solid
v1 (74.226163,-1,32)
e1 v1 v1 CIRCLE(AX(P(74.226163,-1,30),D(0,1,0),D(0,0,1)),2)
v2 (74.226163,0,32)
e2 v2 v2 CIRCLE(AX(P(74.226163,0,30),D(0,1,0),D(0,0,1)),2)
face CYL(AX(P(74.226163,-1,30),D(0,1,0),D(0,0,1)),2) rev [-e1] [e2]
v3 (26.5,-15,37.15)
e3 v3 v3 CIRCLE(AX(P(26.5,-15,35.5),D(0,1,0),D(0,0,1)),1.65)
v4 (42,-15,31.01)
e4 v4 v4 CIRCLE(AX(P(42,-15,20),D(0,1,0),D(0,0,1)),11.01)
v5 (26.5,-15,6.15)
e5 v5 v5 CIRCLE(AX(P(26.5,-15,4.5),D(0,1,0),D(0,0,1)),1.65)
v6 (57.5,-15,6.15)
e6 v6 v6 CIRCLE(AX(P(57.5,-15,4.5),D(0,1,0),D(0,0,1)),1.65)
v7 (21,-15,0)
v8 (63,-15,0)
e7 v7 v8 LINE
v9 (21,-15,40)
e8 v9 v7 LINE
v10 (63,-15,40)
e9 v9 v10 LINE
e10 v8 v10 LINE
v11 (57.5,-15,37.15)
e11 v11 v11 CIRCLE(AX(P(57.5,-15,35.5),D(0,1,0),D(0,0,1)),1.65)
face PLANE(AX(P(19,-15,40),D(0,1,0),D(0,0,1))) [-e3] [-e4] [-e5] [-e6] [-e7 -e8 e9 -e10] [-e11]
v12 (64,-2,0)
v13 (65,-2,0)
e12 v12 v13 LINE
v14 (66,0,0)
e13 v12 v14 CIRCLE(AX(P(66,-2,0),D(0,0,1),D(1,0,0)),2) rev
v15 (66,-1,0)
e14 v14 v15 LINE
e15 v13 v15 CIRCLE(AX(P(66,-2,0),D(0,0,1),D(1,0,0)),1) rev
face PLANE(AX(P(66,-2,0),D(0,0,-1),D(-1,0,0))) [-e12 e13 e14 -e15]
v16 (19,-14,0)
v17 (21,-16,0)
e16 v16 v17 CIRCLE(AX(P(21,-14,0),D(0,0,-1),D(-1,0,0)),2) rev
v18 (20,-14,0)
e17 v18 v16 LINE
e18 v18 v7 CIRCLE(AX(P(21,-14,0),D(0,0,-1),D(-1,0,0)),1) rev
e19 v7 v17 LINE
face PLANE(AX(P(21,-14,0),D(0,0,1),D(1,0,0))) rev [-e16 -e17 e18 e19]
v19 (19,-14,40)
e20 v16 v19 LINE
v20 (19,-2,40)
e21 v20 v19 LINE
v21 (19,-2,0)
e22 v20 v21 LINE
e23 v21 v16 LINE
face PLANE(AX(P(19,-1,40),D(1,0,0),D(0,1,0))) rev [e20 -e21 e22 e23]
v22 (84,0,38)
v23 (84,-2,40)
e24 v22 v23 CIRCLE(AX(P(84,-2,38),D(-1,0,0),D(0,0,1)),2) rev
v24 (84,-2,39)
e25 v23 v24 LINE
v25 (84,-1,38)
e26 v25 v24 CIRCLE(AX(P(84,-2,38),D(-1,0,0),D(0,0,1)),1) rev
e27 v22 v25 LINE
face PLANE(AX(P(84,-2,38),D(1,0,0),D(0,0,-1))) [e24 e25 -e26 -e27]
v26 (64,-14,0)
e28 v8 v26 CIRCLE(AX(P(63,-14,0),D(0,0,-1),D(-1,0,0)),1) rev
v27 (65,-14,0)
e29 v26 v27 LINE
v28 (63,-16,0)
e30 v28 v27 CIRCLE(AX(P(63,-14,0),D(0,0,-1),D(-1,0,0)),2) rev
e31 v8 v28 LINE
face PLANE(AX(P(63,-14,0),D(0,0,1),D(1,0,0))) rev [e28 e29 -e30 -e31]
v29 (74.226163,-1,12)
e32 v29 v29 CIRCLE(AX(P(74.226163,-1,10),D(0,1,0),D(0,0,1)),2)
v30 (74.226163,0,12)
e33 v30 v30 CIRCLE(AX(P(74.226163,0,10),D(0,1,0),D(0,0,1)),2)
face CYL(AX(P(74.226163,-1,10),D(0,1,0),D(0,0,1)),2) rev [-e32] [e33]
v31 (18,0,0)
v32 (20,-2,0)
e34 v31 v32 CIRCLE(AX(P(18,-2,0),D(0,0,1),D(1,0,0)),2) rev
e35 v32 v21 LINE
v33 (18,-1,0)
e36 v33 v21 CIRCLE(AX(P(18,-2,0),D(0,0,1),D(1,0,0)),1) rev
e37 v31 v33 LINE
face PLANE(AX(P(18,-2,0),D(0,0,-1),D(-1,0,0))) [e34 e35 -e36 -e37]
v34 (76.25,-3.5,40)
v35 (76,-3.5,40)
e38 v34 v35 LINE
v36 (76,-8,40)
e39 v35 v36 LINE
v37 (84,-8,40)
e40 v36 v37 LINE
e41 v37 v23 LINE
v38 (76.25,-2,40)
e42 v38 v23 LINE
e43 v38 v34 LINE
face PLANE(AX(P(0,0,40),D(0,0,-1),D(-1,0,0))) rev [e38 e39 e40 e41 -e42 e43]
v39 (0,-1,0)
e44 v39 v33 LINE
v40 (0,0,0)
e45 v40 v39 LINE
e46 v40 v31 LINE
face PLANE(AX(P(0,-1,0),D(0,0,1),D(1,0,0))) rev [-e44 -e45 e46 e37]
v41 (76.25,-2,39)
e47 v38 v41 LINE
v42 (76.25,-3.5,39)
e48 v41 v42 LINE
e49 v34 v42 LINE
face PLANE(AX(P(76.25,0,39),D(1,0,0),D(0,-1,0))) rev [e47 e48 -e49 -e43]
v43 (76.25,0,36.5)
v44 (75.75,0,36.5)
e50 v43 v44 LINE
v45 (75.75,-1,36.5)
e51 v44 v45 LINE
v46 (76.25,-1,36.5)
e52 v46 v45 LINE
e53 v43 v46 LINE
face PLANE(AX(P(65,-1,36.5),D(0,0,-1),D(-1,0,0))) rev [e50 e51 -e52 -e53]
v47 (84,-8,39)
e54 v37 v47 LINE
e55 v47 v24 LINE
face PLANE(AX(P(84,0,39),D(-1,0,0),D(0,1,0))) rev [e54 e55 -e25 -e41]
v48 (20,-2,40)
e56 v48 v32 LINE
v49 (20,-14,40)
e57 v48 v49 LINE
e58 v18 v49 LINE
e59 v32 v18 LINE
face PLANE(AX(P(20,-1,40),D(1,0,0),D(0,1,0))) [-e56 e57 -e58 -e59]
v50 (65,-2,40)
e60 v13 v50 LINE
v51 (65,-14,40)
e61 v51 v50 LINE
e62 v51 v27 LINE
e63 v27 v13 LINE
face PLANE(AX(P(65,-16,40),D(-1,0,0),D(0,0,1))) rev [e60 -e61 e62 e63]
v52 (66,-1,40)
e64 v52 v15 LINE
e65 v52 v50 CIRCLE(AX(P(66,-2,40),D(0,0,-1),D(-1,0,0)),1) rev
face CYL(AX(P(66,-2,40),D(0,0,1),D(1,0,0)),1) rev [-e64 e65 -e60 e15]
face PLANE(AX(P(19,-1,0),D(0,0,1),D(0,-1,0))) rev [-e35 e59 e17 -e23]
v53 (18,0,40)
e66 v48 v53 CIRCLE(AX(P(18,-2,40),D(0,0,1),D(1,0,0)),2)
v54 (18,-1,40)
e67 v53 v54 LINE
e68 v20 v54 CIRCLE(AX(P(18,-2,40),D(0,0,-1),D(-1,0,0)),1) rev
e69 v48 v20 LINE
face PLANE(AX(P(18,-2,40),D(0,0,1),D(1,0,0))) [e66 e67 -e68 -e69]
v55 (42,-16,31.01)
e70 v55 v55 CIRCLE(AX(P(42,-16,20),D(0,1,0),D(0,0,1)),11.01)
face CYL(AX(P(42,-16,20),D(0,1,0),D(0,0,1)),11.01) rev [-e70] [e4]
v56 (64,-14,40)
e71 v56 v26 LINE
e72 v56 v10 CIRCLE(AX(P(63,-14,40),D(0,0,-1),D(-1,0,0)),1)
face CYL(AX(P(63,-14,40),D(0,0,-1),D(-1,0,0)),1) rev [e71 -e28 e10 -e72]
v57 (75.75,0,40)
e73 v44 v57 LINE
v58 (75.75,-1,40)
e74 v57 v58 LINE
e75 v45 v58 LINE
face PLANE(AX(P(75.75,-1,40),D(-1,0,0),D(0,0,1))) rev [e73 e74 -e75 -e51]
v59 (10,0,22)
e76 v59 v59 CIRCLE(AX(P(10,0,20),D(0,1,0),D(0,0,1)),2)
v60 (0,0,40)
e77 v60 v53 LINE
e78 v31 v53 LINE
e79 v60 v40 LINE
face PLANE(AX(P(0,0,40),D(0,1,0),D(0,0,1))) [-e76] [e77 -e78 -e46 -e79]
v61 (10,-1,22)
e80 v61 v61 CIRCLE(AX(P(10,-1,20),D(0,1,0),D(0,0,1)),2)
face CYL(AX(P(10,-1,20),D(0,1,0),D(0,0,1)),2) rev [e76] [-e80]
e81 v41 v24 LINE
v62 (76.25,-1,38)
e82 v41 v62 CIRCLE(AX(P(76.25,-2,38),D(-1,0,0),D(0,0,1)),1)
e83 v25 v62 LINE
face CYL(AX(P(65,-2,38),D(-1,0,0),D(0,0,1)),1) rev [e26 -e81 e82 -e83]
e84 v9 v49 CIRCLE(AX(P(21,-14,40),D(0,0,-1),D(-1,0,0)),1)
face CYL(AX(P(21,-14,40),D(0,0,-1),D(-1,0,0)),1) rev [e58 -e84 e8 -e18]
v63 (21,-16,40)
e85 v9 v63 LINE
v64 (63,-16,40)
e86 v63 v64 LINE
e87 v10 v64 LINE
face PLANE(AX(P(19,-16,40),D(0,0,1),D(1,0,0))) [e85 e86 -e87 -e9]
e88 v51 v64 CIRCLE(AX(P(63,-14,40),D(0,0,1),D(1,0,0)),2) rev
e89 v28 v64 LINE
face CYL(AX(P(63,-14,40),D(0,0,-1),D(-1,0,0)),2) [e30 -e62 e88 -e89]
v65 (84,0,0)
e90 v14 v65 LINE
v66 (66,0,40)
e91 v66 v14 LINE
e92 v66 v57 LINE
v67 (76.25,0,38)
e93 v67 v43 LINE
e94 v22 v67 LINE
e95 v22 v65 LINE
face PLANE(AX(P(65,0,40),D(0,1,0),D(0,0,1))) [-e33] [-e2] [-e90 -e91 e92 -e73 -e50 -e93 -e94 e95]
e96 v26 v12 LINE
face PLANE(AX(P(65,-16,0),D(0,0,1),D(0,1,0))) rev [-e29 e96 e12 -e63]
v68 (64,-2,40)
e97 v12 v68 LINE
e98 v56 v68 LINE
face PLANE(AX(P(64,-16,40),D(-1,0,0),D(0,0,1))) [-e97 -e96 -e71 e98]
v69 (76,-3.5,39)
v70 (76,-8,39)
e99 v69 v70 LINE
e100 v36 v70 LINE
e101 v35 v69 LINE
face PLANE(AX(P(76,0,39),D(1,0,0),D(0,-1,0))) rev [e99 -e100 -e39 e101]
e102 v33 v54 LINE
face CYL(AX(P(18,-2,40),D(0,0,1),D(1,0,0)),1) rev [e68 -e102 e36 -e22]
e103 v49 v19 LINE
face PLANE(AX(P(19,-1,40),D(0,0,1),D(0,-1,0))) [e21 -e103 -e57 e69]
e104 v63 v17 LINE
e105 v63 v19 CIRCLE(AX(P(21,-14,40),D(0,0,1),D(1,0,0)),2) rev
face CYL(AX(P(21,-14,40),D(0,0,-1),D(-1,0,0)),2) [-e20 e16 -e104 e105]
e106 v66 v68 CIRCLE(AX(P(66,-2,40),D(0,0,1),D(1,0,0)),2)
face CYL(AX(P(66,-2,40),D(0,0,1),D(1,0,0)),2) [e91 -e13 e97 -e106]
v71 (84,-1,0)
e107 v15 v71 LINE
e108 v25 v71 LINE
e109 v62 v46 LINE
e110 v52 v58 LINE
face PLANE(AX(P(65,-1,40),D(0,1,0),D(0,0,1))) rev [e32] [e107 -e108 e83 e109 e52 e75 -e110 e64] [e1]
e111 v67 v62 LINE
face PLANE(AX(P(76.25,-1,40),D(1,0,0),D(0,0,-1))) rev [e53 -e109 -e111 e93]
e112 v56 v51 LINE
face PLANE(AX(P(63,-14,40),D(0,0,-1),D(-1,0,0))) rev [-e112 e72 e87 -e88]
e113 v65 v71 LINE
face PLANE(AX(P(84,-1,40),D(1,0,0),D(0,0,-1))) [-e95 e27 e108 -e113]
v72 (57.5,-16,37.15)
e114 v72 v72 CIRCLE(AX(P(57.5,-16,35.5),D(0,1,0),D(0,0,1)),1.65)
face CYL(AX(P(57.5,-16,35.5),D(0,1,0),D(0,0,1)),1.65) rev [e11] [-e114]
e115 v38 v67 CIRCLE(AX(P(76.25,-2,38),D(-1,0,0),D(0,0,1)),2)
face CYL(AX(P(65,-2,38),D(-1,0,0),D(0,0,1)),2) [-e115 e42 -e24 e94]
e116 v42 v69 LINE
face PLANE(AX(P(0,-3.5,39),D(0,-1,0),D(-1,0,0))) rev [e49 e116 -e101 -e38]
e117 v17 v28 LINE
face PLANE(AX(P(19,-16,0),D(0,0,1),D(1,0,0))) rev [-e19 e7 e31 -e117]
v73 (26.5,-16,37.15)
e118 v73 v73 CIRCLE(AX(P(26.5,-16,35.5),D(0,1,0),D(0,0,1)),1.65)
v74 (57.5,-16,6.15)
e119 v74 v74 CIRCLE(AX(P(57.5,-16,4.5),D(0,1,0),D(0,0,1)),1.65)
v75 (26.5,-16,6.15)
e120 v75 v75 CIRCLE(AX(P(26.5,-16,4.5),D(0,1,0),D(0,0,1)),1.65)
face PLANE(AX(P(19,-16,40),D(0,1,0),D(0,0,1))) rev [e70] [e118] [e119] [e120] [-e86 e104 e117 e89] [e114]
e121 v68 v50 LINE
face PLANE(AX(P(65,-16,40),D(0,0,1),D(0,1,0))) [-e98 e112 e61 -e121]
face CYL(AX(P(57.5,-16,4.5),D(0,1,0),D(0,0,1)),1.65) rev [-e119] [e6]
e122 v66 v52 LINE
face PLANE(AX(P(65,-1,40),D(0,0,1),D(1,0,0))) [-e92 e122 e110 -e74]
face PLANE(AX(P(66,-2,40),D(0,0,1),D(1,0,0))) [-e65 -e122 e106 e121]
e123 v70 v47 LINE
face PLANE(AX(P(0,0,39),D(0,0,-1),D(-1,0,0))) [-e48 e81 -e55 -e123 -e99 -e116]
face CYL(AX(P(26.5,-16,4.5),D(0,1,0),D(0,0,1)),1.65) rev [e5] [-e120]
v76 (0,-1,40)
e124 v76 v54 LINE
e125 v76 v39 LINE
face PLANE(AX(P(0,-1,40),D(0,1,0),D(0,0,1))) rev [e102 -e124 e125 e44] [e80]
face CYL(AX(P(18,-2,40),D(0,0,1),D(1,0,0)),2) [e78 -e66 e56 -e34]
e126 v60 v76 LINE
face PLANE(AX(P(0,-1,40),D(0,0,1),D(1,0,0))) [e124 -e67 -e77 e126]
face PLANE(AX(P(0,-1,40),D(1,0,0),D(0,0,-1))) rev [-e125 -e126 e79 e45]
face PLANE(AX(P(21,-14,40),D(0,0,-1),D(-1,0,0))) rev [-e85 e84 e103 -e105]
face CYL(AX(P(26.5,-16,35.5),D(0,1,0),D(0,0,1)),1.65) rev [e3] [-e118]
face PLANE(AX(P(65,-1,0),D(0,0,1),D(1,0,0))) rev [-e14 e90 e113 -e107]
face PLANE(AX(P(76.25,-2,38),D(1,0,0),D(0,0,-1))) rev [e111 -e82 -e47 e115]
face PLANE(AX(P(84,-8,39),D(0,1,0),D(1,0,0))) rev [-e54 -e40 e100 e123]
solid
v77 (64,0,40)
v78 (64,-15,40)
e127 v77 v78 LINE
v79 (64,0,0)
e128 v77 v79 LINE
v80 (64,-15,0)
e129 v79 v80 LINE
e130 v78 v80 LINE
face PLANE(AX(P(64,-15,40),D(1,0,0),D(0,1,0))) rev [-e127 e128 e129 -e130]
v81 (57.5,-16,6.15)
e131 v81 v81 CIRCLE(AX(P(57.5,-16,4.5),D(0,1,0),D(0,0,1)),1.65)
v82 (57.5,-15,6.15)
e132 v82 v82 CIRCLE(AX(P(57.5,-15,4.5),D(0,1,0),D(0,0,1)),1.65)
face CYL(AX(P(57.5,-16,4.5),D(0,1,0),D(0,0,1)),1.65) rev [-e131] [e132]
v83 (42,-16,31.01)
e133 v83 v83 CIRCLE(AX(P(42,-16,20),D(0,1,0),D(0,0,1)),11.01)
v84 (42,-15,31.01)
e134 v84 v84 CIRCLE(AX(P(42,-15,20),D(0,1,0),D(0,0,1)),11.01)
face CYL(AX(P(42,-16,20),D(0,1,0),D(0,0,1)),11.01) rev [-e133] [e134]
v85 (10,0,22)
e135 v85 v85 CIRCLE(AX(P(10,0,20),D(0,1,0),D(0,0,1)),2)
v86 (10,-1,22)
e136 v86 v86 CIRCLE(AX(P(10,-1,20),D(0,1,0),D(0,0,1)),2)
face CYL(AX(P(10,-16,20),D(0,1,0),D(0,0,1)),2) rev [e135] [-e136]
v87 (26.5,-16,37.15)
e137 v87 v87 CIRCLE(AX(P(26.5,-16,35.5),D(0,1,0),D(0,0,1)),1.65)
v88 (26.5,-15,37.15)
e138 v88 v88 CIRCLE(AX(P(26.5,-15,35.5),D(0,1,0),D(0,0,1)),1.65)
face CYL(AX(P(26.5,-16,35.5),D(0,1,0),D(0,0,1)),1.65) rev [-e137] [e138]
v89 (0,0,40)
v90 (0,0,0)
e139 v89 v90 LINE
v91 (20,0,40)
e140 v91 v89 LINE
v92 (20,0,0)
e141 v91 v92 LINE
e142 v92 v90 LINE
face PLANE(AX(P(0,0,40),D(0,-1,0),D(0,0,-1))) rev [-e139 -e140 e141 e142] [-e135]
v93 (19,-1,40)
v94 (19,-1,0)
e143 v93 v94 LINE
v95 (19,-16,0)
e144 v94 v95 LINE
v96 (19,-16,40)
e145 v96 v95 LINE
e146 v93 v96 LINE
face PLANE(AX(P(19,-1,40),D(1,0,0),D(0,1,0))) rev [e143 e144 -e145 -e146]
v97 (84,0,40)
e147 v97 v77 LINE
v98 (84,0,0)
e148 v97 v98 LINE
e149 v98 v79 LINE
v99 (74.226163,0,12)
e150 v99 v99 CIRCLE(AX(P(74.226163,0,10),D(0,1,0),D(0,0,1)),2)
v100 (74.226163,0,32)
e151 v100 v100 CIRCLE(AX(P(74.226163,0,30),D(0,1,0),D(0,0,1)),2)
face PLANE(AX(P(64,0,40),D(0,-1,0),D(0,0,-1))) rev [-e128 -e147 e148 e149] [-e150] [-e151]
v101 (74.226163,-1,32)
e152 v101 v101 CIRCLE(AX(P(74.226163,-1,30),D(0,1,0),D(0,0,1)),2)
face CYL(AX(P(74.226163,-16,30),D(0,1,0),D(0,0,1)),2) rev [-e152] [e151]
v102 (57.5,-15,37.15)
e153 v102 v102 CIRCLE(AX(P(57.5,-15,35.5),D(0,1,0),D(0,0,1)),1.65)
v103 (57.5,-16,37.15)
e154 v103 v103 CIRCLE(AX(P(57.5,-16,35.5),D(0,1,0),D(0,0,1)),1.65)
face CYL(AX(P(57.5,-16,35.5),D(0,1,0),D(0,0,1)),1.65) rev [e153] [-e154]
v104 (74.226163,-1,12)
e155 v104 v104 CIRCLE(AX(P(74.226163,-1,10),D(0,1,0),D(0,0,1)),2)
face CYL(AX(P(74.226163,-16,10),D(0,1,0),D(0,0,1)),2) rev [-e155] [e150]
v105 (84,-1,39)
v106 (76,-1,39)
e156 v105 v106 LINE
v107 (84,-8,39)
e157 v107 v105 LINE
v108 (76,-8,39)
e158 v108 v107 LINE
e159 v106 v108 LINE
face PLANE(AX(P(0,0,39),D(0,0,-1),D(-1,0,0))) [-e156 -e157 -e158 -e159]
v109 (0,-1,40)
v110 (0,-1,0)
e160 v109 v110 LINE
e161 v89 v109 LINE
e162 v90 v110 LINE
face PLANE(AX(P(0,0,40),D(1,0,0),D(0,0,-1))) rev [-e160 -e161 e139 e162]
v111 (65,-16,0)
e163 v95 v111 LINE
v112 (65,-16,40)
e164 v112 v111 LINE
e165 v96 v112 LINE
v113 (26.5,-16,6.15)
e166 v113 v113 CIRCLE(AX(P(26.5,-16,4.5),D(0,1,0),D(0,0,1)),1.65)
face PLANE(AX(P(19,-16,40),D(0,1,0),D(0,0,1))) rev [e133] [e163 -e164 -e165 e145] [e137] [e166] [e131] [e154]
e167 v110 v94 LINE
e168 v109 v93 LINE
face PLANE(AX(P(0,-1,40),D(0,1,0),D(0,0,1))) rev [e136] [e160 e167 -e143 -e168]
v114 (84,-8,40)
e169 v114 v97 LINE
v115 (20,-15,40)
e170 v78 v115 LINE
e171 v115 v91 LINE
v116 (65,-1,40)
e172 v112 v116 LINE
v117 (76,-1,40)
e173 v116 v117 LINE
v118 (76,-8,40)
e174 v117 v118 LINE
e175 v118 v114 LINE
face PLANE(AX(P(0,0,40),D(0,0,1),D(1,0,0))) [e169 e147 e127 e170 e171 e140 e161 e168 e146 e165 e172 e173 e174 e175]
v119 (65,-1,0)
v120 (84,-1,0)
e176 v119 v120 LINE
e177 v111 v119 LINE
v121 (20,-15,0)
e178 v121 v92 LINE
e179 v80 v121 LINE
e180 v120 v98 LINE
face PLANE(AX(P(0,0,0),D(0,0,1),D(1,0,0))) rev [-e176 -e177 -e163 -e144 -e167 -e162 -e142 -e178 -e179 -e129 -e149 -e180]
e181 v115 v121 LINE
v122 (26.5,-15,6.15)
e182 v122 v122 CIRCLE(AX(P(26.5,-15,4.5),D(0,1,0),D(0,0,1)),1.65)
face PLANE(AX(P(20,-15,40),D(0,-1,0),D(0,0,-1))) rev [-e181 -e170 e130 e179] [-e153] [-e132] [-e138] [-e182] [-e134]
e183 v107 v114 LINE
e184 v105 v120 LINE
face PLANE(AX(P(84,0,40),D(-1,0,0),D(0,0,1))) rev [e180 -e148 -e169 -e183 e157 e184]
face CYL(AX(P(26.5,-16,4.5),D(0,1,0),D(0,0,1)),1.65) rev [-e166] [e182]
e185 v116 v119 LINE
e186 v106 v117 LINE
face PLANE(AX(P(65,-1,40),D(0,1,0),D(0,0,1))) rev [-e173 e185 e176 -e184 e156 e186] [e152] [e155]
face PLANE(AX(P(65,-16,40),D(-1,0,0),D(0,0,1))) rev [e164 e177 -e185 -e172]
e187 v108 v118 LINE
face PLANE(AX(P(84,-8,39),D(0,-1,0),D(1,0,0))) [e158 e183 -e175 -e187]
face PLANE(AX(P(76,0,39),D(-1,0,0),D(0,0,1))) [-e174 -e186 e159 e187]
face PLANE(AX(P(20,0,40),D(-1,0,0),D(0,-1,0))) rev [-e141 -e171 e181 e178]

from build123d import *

# Parameters (mm, degrees)
BOSS_EXTRUDE1_DEPTH          = 40
SKETCH2_R                    = 2
CUT_EXTRUDE1_DEPTH           = 95.40338977
SKETCH4_W                    = 8
SKETCH4_H                    = 8
BOSS_EXTRUDE2_DEPTH          = 1
SKETCH5_R                    = 1.65
SKETCH5_R_2                  = 11.01
CUT_EXTRUDE2_DEPTH           = 95.23905772
CONVERT_SOLID1_START         = -14
CONVERT_SOLID1_OUTLINE_W     = 1
CONVERT_SOLID1_OUTLINE_H     = 40
CONVERT_SOLID1_DEPTH         = 12
CONVERT_SOLID1_START_2       = -8
CONVERT_SOLID1_2_OUTLINE_W   = 7.75
CONVERT_SOLID1_2_OUTLINE_H   = 1
CONVERT_SOLID1_2_DEPTH       = 6
CONVERT_SOLID1_3_OUTLINE_W   = 0.25
CONVERT_SOLID1_3_OUTLINE_H   = 1
CONVERT_SOLID1_3_DEPTH       = 4.5
CONVERT_SOLID1_4_OUTLINE_W   = 7.75
CONVERT_SOLID1_4_OUTLINE_H   = 1
CONVERT_SOLID1_4_DEPTH       = 40
CONVERT_SOLID1_5_OUTLINE_W   = 0.5
CONVERT_SOLID1_5_OUTLINE_H   = 1
CONVERT_SOLID1_5_DEPTH       = 36.5
CONVERT_SOLID1_START_3       = 38
CONVERT_SOLID1_6_OUTLINE_W   = 7.75
CONVERT_SOLID1_6_OUTLINE_H   = 1
CONVERT_SOLID1_6_DEPTH       = 2
CONVERT_SOLID1_START_4       = -16
CONVERT_SOLID1_7_OUTLINE_R   = 1.65
CONVERT_SOLID1_7_OUTLINE_R_2 = 11.01
CONVERT_SOLID1_7_OUTLINE_R_3 = 2
CONVERT_SOLID1_7_DEPTH       = 16
CONVERT_SOLID1_START_5       = 76.25
CONVERT_SOLID1_8_DEPTH       = 7.75


with BuildPart() as part:
    # Sketch1 → Boss-Extrude1 (new body)
    with BuildSketch(Plane.XY):
        Polygon((64, 0), (84, 0), (84, -1), (65, -1), (65, -16), (19, -16), (19, -1), (0, -1), (0, 0), (20, 0), (20, -15), (64, -15), align=None)
    extrude(amount=BOSS_EXTRUDE1_DEPTH)

    # Sketch2 → Cut-Extrude1 (cut, through all)
    with BuildSketch(Plane(origin=(0, 0, 0), x_dir=(1, 0, 0), z_dir=(0, 1, 0))):
        with Locations(Location((10, -20, 0), (0, 0, 270))):
            Circle(SKETCH2_R)
        with Locations(Location((74.226162893, -10, 0), (0, 0, 270))):
            Circle(SKETCH2_R)
        with Locations(Location((74.226162893, -30, 0), (0, 0, 270))):
            Circle(SKETCH2_R)
    extrude(amount=-CUT_EXTRUDE1_DEPTH, mode=Mode.SUBTRACT)

    # Sketch4 → Boss-Extrude2 (add)
    with BuildSketch(Plane.XY.offset(40)):
        with Locations((80, -4)):
            Rectangle(SKETCH4_W, SKETCH4_H)
    extrude(amount=-BOSS_EXTRUDE2_DEPTH)

    # Sketch5 → Cut-Extrude2 (cut, through all)
    with BuildSketch(Plane(origin=(0, -15, 0), x_dir=(1, 0, 0), z_dir=(0, 1, 0))):
        with Locations(Location((26.5, -4.5, 0), (0, 0, 270))):
            Circle(SKETCH5_R)
        with Locations(Location((57.5, -4.5, 0), (0, 0, 270))):
            Circle(SKETCH5_R)
        with Locations(Location((26.5, -35.5, 0), (0, 0, 270))):
            Circle(SKETCH5_R)
        with Locations(Location((57.5, -35.5, 0), (0, 0, 270))):
            Circle(SKETCH5_R)
        with Locations(Location((42, -20, 0), (0, 0, 270))):
            Circle(SKETCH5_R_2)
    extrude(amount=-CUT_EXTRUDE2_DEPTH, mode=Mode.SUBTRACT)


with BuildPart() as body_2:
    # Convert-Solid1: read off the stored shape, not the designer's step
    # Convert-Solid1 outline → Convert-Solid1 (new body)
    with BuildSketch(Plane(origin=(0, 0, 0), x_dir=(1, 0, 0), z_dir=(0, 1, 0)).offset(CONVERT_SOLID1_START)):
        with Locations((64.5, -20)):
            Rectangle(CONVERT_SOLID1_OUTLINE_W, CONVERT_SOLID1_OUTLINE_H)
        with Locations((19.5, -20)):
            Rectangle(CONVERT_SOLID1_OUTLINE_W, CONVERT_SOLID1_OUTLINE_H)
    extrude(amount=CONVERT_SOLID1_DEPTH)

    # Convert-Solid1 2 outline → Convert-Solid1 2 (add)
    with BuildSketch(Plane(origin=(0, 0, 0), x_dir=(1, 0, 0), z_dir=(0, 1, 0)).offset(CONVERT_SOLID1_START_2)):
        with Locations((80.125, -39.5)):
            Rectangle(CONVERT_SOLID1_2_OUTLINE_W, CONVERT_SOLID1_2_OUTLINE_H)
    extrude(amount=CONVERT_SOLID1_2_DEPTH)

    # Convert-Solid1 3 outline → Convert-Solid1 3 (add)
    with BuildSketch(Plane(origin=(0, 0, 0), x_dir=(1, 0, 0), z_dir=(0, 1, 0)).offset(CONVERT_SOLID1_START_2)):
        with Locations((76.125, -39.5)):
            Rectangle(CONVERT_SOLID1_3_OUTLINE_W, CONVERT_SOLID1_3_OUTLINE_H)
    extrude(amount=CONVERT_SOLID1_3_DEPTH)

    # Convert-Solid1 4 outline → Convert-Solid1 4 (add)
    with BuildSketch(Plane.XY):
        with Locations((80.125, -0.5)):
            Rectangle(CONVERT_SOLID1_4_OUTLINE_W, CONVERT_SOLID1_4_OUTLINE_H)
        with BuildLine():
            Line((66, -1), (75.75, -1))
            Line((75.75, -1), (75.75, 0))
            Line((75.75, 0), (66, 0))
            ThreePointArc((66, 0), (64.585786438, -0.585786438), (64, -2))
            Line((64, -2), (65, -2))
            ThreePointArc((65, -2), (65.292893219, -1.292893219), (66, -1))
        make_face()
        with BuildLine():
            Line((0, 0), (0, -1))
            Line((0, -1), (18, -1))
            ThreePointArc((18, -1), (18.707106781, -1.292893219), (19, -2))
            Line((19, -2), (20, -2))
            ThreePointArc((20, -2), (19.414213562, -0.585786438), (18, 0))
            Line((18, 0), (0, 0))
        make_face()
        with BuildLine():
            Line((21, -16), (63, -16))
            ThreePointArc((63, -16), (64.414213562, -15.414213562), (65, -14))
            Line((65, -14), (64, -14))
            ThreePointArc((64, -14), (63.707106781, -14.707106781), (63, -15))
            Line((63, -15), (21, -15))
            ThreePointArc((21, -15), (20.292893219, -14.707106781), (20, -14))
            Line((20, -14), (19, -14))
            ThreePointArc((19, -14), (19.585786438, -15.414213562), (21, -16))
        make_face()
    extrude(amount=CONVERT_SOLID1_4_DEPTH)

    # Convert-Solid1 5 outline → Convert-Solid1 5 (add)
    with BuildSketch(Plane.XY):
        with Locations((76, -0.5)):
            Rectangle(CONVERT_SOLID1_5_OUTLINE_W, CONVERT_SOLID1_5_OUTLINE_H)
    extrude(amount=CONVERT_SOLID1_5_DEPTH)

    # Convert-Solid1 6 outline → Convert-Solid1 6 (add)
    with BuildSketch(Plane.XY.offset(CONVERT_SOLID1_START_3)):
        with Locations((80.125, -1.5)):
            Rectangle(CONVERT_SOLID1_6_OUTLINE_W, CONVERT_SOLID1_6_OUTLINE_H)
    extrude(amount=CONVERT_SOLID1_6_DEPTH)

    # Convert-Solid1 7 outline → Convert-Solid1 7 (cut)
    with BuildSketch(Plane(origin=(0, 0, 0), x_dir=(1, 0, 0), z_dir=(0, 1, 0)).offset(CONVERT_SOLID1_START_4)):
        with Locations((26.5, -35.5)):
            Circle(CONVERT_SOLID1_7_OUTLINE_R)
        with Locations((57.5, -35.5)):
            Circle(CONVERT_SOLID1_7_OUTLINE_R)
        with Locations((57.5, -4.5)):
            Circle(CONVERT_SOLID1_7_OUTLINE_R)
        with Locations((26.5, -4.5)):
            Circle(CONVERT_SOLID1_7_OUTLINE_R)
        with Locations((42, -20)):
            Circle(CONVERT_SOLID1_7_OUTLINE_R_2)
        with Locations((10, -20)):
            Circle(CONVERT_SOLID1_7_OUTLINE_R_3)
        with Locations((74.226162893, -30)):
            Circle(CONVERT_SOLID1_7_OUTLINE_R_3)
        with Locations((74.226162893, -10)):
            Circle(CONVERT_SOLID1_7_OUTLINE_R_3)
    extrude(amount=CONVERT_SOLID1_7_DEPTH, mode=Mode.SUBTRACT)

    # Convert-Solid1 8 outline → Convert-Solid1 8 (cut)
    with BuildSketch(Plane.YZ.offset(CONVERT_SOLID1_START_5)):
        with BuildLine():
            ThreePointArc((-2, 40), (-0.585786438, 39.414213562), (0, 38))
            Line((0, 38), (0, 40))
            Line((0, 40), (-2, 40))
        make_face()
        with BuildLine():
            ThreePointArc((-1, 38), (-1.292893219, 38.707106781), (-2, 39))
            Line((-2, 39), (-2, 38))
            Line((-2, 38), (-1, 38))
        make_face()
    extrude(amount=CONVERT_SOLID1_8_DEPTH, mode=Mode.SUBTRACT)


solid = Compound([part.part, body_2.part])
